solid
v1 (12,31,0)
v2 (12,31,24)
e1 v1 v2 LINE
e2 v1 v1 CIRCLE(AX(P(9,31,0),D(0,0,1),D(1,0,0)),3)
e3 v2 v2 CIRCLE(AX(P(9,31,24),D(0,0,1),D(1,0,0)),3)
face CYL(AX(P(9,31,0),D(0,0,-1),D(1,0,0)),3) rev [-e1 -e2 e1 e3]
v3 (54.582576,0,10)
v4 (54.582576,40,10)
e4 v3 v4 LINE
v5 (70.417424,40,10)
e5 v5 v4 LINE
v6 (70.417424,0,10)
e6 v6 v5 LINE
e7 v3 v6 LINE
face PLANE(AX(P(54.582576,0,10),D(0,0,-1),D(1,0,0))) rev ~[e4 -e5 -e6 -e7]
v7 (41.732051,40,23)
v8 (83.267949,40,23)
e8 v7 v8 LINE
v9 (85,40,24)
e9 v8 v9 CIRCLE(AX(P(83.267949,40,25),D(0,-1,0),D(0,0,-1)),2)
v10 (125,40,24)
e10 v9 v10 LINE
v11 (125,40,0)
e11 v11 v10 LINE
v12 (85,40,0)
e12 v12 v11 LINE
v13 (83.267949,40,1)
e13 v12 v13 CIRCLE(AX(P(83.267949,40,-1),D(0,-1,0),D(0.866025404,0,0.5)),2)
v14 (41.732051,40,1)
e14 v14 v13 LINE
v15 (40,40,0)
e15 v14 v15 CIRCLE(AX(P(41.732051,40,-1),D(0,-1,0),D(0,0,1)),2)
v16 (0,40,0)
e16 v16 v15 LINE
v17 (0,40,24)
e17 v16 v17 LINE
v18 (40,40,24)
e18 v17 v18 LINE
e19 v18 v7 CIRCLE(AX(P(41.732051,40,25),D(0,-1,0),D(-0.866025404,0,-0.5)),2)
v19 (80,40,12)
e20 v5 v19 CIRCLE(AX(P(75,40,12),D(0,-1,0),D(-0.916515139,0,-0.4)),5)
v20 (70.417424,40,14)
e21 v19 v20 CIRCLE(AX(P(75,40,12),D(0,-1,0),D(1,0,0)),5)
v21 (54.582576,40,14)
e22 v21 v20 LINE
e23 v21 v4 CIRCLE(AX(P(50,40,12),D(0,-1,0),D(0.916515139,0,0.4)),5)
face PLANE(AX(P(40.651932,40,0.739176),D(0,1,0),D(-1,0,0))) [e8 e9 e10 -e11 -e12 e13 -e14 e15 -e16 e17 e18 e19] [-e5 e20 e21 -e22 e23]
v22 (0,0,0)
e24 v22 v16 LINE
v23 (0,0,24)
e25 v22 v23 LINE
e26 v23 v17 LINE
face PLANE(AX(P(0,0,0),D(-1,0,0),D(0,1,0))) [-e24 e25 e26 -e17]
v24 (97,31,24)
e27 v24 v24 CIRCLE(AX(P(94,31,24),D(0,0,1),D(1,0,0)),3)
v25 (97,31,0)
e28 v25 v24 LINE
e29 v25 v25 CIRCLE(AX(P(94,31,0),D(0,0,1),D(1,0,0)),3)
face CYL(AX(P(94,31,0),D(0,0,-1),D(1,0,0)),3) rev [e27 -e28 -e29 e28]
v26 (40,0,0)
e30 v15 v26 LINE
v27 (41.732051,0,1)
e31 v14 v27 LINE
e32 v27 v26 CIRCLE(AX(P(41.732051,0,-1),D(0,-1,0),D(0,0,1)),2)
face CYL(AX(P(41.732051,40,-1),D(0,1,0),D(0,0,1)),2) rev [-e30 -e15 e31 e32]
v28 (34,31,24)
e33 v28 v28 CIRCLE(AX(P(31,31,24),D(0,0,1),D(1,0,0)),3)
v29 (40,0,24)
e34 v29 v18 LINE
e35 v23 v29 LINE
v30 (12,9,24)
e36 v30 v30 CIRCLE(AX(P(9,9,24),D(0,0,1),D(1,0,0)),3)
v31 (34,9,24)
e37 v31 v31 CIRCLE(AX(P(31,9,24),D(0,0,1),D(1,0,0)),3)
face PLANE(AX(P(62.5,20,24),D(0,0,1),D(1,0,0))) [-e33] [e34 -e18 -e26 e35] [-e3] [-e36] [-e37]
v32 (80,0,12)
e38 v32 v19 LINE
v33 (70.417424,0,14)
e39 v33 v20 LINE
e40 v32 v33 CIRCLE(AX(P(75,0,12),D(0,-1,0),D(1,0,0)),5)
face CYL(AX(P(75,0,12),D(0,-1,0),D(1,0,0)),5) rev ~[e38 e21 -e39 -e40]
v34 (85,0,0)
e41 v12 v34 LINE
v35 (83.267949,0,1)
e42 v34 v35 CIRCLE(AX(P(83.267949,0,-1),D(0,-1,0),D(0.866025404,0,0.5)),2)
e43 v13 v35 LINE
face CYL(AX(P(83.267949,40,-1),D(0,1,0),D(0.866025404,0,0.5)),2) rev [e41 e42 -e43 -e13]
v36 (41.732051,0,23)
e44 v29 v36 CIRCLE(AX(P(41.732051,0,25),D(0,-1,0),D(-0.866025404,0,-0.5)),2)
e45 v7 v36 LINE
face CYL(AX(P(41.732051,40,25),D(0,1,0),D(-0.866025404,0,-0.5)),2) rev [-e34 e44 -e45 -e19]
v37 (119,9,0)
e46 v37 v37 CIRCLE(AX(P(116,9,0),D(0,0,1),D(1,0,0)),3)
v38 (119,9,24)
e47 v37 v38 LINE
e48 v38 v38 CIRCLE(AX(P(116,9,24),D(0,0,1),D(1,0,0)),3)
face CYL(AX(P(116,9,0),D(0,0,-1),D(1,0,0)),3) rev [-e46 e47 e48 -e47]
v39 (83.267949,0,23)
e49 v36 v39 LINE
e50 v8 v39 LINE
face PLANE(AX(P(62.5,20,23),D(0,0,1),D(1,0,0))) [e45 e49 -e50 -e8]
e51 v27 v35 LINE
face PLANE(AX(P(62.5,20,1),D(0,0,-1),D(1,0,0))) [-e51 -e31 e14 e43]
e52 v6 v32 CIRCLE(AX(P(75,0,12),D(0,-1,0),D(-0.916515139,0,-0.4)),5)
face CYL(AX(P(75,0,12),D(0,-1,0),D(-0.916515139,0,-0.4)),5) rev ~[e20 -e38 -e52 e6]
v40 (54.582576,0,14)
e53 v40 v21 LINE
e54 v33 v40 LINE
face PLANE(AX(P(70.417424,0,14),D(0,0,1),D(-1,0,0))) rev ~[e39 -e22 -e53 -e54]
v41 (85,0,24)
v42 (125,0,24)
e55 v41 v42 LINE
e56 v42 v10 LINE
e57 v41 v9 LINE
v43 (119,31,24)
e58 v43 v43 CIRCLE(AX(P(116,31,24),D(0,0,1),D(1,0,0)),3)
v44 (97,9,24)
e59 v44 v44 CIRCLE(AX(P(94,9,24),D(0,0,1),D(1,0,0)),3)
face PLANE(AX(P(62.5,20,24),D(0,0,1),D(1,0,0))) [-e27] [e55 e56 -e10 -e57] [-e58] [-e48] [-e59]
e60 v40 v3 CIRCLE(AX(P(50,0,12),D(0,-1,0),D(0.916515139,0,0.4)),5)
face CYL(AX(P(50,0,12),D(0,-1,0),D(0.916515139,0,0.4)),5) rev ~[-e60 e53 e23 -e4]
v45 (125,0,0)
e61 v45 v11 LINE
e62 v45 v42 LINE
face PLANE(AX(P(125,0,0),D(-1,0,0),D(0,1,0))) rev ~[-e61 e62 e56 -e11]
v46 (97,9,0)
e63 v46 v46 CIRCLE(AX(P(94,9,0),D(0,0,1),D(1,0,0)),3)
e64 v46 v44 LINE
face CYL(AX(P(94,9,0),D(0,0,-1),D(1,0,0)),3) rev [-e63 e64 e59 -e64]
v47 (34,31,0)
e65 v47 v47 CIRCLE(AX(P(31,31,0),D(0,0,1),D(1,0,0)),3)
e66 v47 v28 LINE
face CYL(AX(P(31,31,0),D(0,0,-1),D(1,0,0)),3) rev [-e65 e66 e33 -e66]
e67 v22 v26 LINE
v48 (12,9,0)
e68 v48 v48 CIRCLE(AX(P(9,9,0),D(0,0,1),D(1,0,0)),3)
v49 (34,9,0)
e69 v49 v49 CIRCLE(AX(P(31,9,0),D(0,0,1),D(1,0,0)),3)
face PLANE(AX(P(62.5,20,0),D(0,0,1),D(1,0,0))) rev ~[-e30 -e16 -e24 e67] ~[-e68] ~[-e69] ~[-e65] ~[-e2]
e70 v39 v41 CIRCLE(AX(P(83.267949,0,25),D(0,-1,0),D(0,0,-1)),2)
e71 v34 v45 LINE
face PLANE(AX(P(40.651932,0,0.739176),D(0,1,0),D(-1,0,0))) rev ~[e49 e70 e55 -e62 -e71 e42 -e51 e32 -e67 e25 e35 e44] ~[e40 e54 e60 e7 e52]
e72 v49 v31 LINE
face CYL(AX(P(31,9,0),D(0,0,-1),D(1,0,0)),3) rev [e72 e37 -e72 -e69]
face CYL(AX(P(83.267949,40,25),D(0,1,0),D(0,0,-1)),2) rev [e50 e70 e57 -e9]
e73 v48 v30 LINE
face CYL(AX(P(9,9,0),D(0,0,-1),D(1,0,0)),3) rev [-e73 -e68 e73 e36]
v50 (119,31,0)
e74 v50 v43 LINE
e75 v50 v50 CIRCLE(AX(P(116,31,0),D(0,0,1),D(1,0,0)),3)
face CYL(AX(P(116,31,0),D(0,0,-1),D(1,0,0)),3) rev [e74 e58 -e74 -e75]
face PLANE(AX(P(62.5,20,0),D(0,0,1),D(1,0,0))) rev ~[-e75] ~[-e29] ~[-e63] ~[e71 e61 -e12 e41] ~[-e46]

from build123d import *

# Parameters (mm, degrees)
F0_W        = 125
F0_H        = 40
F0_R        = 3
F1_DEPTH    = 24
F3_DEPTH    = 45
F4_W        = 45
F4_H        = 40
F5_DEPTH    = 1
F6_W        = 45
F6_H        = 40
F7_DEPTH    = 1
F8_T1_DEPTH = 40


# Not quite as in the source:
# - a fillet or chamfer that OpenCascade refuses, or shapes differently, is made with other operations: its cross-section is extruded or revolved along the edge and cut away or added


with BuildPart() as f1:
    # F0 (on Top) → F1 (new body)
    with BuildSketch(Plane.XY):
        with Locations((62.5, 20)):
            Rectangle(F0_W, F0_H)
        with Locations((9, 9)):
            Circle(F0_R, mode=Mode.SUBTRACT)
        with Locations((31, 9)):
            Circle(F0_R, mode=Mode.SUBTRACT)
        with Locations((94, 9)):
            Circle(F0_R, mode=Mode.SUBTRACT)
        with Locations((116, 9)):
            Circle(F0_R, mode=Mode.SUBTRACT)
        with Locations((9, 31)):
            Circle(F0_R, mode=Mode.SUBTRACT)
        with Locations((31, 31)):
            Circle(F0_R, mode=Mode.SUBTRACT)
        with Locations((94, 31)):
            Circle(F0_R, mode=Mode.SUBTRACT)
        with Locations((116, 31)):
            Circle(F0_R, mode=Mode.SUBTRACT)
    extrude(amount=F1_DEPTH)

    # F2 (on face) → F3 (cut)
    with BuildSketch(Plane.XZ):
        with BuildLine():
            Line((54, 14), (54.582575695, 14))
            ThreePointArc((54.582575695, 14), (45, 12), (54.582575695, 10))
            Line((54.582575695, 10), (54, 10))
            Line((54, 10), (54, 14))
        make_face()
        with BuildLine():
            ThreePointArc((54.582575695, 10), (54.8945315647, 10.9784517816), (55, 12))
            ThreePointArc((55, 12), (54.8945315647, 13.0215482184), (54.582575695, 14))
            Line((54.582575695, 14), (54, 14))
            Line((54, 14), (54, 10))
            Line((54, 10), (54.582575695, 10))
        make_face()
        with BuildLine():
            ThreePointArc((54.582575695, 14), (54.8945315647, 13.0215482184), (55, 12))
            ThreePointArc((55, 12), (54.8945315647, 10.9784517816), (54.582575695, 10))
            Line((54.582575695, 10), (70.417424305, 10))
            ThreePointArc((70.417424305, 10), (70, 12), (70.417424305, 14))
            Line((70.417424305, 14), (54.582575695, 14))
        make_face()
        with BuildLine():
            Line((71, 14), (70.417424305, 14))
            ThreePointArc((70.417424305, 14), (70, 12), (70.417424305, 10))
            Line((70.417424305, 10), (71, 10))
            Line((71, 10), (71, 14))
        make_face()
        with BuildLine():
            ThreePointArc((80, 12), (76.0215482184, 16.8945315647), (70.417424305, 14))
            Line((70.417424305, 14), (71, 14))
            Line((71, 14), (71, 10))
            Line((71, 10), (70.417424305, 10))
            ThreePointArc((70.417424305, 10), (76.0215482184, 7.1054684353), (80, 12))
        make_face()
    extrude(amount=-F3_DEPTH, mode=Mode.SUBTRACT)

    # F4 (on face) → F5 (cut)
    with BuildSketch(Plane.XY.offset(24)):
        with Locations((62.5, 20)):
            Rectangle(F4_W, F4_H)
    extrude(amount=-F5_DEPTH, mode=Mode.SUBTRACT)

    # F6 (on face) → F7 (cut)
    with BuildSketch(Plane(origin=(0, 0, 0), x_dir=(1, 0, 0), z_dir=(0, 0, -1))):
        with Locations((62.5, -20)):
            Rectangle(F6_W, F6_H)
    extrude(amount=-F7_DEPTH, mode=Mode.SUBTRACT)

    # F8: fillet of radius 2 on 4 edges, made by hand

    # F8_s2 → F8_t1 (join)
    with BuildSketch(Plane.XZ.offset(-40)):
        with BuildLine():
            ThreePointArc((41.7320508076, 1), (40.7320508076, 0.7320508076), (40, 0))
            Line((40, 0), (40, 1))
            Line((40, 1), (41.7320508076, 1))
        make_face()
        with BuildLine():
            ThreePointArc((85, 0), (84.2679491924, 0.7320508076), (83.2679491924, 1))
            Line((83.2679491924, 1), (85, 1))
            Line((85, 1), (85, 0))
        make_face()
        with BuildLine():
            ThreePointArc((83.2679491924, 23), (84.2679491924, 23.2679491924), (85, 24))
            Line((85, 24), (85, 23))
            Line((85, 23), (83.2679491924, 23))
        make_face()
        with BuildLine():
            ThreePointArc((40, 24), (40.7320508076, 23.2679491924), (41.7320508076, 23))
            Line((41.7320508076, 23), (40, 23))
            Line((40, 23), (40, 24))
        make_face()
    extrude(amount=F8_T1_DEPTH)


solid = f1.part
